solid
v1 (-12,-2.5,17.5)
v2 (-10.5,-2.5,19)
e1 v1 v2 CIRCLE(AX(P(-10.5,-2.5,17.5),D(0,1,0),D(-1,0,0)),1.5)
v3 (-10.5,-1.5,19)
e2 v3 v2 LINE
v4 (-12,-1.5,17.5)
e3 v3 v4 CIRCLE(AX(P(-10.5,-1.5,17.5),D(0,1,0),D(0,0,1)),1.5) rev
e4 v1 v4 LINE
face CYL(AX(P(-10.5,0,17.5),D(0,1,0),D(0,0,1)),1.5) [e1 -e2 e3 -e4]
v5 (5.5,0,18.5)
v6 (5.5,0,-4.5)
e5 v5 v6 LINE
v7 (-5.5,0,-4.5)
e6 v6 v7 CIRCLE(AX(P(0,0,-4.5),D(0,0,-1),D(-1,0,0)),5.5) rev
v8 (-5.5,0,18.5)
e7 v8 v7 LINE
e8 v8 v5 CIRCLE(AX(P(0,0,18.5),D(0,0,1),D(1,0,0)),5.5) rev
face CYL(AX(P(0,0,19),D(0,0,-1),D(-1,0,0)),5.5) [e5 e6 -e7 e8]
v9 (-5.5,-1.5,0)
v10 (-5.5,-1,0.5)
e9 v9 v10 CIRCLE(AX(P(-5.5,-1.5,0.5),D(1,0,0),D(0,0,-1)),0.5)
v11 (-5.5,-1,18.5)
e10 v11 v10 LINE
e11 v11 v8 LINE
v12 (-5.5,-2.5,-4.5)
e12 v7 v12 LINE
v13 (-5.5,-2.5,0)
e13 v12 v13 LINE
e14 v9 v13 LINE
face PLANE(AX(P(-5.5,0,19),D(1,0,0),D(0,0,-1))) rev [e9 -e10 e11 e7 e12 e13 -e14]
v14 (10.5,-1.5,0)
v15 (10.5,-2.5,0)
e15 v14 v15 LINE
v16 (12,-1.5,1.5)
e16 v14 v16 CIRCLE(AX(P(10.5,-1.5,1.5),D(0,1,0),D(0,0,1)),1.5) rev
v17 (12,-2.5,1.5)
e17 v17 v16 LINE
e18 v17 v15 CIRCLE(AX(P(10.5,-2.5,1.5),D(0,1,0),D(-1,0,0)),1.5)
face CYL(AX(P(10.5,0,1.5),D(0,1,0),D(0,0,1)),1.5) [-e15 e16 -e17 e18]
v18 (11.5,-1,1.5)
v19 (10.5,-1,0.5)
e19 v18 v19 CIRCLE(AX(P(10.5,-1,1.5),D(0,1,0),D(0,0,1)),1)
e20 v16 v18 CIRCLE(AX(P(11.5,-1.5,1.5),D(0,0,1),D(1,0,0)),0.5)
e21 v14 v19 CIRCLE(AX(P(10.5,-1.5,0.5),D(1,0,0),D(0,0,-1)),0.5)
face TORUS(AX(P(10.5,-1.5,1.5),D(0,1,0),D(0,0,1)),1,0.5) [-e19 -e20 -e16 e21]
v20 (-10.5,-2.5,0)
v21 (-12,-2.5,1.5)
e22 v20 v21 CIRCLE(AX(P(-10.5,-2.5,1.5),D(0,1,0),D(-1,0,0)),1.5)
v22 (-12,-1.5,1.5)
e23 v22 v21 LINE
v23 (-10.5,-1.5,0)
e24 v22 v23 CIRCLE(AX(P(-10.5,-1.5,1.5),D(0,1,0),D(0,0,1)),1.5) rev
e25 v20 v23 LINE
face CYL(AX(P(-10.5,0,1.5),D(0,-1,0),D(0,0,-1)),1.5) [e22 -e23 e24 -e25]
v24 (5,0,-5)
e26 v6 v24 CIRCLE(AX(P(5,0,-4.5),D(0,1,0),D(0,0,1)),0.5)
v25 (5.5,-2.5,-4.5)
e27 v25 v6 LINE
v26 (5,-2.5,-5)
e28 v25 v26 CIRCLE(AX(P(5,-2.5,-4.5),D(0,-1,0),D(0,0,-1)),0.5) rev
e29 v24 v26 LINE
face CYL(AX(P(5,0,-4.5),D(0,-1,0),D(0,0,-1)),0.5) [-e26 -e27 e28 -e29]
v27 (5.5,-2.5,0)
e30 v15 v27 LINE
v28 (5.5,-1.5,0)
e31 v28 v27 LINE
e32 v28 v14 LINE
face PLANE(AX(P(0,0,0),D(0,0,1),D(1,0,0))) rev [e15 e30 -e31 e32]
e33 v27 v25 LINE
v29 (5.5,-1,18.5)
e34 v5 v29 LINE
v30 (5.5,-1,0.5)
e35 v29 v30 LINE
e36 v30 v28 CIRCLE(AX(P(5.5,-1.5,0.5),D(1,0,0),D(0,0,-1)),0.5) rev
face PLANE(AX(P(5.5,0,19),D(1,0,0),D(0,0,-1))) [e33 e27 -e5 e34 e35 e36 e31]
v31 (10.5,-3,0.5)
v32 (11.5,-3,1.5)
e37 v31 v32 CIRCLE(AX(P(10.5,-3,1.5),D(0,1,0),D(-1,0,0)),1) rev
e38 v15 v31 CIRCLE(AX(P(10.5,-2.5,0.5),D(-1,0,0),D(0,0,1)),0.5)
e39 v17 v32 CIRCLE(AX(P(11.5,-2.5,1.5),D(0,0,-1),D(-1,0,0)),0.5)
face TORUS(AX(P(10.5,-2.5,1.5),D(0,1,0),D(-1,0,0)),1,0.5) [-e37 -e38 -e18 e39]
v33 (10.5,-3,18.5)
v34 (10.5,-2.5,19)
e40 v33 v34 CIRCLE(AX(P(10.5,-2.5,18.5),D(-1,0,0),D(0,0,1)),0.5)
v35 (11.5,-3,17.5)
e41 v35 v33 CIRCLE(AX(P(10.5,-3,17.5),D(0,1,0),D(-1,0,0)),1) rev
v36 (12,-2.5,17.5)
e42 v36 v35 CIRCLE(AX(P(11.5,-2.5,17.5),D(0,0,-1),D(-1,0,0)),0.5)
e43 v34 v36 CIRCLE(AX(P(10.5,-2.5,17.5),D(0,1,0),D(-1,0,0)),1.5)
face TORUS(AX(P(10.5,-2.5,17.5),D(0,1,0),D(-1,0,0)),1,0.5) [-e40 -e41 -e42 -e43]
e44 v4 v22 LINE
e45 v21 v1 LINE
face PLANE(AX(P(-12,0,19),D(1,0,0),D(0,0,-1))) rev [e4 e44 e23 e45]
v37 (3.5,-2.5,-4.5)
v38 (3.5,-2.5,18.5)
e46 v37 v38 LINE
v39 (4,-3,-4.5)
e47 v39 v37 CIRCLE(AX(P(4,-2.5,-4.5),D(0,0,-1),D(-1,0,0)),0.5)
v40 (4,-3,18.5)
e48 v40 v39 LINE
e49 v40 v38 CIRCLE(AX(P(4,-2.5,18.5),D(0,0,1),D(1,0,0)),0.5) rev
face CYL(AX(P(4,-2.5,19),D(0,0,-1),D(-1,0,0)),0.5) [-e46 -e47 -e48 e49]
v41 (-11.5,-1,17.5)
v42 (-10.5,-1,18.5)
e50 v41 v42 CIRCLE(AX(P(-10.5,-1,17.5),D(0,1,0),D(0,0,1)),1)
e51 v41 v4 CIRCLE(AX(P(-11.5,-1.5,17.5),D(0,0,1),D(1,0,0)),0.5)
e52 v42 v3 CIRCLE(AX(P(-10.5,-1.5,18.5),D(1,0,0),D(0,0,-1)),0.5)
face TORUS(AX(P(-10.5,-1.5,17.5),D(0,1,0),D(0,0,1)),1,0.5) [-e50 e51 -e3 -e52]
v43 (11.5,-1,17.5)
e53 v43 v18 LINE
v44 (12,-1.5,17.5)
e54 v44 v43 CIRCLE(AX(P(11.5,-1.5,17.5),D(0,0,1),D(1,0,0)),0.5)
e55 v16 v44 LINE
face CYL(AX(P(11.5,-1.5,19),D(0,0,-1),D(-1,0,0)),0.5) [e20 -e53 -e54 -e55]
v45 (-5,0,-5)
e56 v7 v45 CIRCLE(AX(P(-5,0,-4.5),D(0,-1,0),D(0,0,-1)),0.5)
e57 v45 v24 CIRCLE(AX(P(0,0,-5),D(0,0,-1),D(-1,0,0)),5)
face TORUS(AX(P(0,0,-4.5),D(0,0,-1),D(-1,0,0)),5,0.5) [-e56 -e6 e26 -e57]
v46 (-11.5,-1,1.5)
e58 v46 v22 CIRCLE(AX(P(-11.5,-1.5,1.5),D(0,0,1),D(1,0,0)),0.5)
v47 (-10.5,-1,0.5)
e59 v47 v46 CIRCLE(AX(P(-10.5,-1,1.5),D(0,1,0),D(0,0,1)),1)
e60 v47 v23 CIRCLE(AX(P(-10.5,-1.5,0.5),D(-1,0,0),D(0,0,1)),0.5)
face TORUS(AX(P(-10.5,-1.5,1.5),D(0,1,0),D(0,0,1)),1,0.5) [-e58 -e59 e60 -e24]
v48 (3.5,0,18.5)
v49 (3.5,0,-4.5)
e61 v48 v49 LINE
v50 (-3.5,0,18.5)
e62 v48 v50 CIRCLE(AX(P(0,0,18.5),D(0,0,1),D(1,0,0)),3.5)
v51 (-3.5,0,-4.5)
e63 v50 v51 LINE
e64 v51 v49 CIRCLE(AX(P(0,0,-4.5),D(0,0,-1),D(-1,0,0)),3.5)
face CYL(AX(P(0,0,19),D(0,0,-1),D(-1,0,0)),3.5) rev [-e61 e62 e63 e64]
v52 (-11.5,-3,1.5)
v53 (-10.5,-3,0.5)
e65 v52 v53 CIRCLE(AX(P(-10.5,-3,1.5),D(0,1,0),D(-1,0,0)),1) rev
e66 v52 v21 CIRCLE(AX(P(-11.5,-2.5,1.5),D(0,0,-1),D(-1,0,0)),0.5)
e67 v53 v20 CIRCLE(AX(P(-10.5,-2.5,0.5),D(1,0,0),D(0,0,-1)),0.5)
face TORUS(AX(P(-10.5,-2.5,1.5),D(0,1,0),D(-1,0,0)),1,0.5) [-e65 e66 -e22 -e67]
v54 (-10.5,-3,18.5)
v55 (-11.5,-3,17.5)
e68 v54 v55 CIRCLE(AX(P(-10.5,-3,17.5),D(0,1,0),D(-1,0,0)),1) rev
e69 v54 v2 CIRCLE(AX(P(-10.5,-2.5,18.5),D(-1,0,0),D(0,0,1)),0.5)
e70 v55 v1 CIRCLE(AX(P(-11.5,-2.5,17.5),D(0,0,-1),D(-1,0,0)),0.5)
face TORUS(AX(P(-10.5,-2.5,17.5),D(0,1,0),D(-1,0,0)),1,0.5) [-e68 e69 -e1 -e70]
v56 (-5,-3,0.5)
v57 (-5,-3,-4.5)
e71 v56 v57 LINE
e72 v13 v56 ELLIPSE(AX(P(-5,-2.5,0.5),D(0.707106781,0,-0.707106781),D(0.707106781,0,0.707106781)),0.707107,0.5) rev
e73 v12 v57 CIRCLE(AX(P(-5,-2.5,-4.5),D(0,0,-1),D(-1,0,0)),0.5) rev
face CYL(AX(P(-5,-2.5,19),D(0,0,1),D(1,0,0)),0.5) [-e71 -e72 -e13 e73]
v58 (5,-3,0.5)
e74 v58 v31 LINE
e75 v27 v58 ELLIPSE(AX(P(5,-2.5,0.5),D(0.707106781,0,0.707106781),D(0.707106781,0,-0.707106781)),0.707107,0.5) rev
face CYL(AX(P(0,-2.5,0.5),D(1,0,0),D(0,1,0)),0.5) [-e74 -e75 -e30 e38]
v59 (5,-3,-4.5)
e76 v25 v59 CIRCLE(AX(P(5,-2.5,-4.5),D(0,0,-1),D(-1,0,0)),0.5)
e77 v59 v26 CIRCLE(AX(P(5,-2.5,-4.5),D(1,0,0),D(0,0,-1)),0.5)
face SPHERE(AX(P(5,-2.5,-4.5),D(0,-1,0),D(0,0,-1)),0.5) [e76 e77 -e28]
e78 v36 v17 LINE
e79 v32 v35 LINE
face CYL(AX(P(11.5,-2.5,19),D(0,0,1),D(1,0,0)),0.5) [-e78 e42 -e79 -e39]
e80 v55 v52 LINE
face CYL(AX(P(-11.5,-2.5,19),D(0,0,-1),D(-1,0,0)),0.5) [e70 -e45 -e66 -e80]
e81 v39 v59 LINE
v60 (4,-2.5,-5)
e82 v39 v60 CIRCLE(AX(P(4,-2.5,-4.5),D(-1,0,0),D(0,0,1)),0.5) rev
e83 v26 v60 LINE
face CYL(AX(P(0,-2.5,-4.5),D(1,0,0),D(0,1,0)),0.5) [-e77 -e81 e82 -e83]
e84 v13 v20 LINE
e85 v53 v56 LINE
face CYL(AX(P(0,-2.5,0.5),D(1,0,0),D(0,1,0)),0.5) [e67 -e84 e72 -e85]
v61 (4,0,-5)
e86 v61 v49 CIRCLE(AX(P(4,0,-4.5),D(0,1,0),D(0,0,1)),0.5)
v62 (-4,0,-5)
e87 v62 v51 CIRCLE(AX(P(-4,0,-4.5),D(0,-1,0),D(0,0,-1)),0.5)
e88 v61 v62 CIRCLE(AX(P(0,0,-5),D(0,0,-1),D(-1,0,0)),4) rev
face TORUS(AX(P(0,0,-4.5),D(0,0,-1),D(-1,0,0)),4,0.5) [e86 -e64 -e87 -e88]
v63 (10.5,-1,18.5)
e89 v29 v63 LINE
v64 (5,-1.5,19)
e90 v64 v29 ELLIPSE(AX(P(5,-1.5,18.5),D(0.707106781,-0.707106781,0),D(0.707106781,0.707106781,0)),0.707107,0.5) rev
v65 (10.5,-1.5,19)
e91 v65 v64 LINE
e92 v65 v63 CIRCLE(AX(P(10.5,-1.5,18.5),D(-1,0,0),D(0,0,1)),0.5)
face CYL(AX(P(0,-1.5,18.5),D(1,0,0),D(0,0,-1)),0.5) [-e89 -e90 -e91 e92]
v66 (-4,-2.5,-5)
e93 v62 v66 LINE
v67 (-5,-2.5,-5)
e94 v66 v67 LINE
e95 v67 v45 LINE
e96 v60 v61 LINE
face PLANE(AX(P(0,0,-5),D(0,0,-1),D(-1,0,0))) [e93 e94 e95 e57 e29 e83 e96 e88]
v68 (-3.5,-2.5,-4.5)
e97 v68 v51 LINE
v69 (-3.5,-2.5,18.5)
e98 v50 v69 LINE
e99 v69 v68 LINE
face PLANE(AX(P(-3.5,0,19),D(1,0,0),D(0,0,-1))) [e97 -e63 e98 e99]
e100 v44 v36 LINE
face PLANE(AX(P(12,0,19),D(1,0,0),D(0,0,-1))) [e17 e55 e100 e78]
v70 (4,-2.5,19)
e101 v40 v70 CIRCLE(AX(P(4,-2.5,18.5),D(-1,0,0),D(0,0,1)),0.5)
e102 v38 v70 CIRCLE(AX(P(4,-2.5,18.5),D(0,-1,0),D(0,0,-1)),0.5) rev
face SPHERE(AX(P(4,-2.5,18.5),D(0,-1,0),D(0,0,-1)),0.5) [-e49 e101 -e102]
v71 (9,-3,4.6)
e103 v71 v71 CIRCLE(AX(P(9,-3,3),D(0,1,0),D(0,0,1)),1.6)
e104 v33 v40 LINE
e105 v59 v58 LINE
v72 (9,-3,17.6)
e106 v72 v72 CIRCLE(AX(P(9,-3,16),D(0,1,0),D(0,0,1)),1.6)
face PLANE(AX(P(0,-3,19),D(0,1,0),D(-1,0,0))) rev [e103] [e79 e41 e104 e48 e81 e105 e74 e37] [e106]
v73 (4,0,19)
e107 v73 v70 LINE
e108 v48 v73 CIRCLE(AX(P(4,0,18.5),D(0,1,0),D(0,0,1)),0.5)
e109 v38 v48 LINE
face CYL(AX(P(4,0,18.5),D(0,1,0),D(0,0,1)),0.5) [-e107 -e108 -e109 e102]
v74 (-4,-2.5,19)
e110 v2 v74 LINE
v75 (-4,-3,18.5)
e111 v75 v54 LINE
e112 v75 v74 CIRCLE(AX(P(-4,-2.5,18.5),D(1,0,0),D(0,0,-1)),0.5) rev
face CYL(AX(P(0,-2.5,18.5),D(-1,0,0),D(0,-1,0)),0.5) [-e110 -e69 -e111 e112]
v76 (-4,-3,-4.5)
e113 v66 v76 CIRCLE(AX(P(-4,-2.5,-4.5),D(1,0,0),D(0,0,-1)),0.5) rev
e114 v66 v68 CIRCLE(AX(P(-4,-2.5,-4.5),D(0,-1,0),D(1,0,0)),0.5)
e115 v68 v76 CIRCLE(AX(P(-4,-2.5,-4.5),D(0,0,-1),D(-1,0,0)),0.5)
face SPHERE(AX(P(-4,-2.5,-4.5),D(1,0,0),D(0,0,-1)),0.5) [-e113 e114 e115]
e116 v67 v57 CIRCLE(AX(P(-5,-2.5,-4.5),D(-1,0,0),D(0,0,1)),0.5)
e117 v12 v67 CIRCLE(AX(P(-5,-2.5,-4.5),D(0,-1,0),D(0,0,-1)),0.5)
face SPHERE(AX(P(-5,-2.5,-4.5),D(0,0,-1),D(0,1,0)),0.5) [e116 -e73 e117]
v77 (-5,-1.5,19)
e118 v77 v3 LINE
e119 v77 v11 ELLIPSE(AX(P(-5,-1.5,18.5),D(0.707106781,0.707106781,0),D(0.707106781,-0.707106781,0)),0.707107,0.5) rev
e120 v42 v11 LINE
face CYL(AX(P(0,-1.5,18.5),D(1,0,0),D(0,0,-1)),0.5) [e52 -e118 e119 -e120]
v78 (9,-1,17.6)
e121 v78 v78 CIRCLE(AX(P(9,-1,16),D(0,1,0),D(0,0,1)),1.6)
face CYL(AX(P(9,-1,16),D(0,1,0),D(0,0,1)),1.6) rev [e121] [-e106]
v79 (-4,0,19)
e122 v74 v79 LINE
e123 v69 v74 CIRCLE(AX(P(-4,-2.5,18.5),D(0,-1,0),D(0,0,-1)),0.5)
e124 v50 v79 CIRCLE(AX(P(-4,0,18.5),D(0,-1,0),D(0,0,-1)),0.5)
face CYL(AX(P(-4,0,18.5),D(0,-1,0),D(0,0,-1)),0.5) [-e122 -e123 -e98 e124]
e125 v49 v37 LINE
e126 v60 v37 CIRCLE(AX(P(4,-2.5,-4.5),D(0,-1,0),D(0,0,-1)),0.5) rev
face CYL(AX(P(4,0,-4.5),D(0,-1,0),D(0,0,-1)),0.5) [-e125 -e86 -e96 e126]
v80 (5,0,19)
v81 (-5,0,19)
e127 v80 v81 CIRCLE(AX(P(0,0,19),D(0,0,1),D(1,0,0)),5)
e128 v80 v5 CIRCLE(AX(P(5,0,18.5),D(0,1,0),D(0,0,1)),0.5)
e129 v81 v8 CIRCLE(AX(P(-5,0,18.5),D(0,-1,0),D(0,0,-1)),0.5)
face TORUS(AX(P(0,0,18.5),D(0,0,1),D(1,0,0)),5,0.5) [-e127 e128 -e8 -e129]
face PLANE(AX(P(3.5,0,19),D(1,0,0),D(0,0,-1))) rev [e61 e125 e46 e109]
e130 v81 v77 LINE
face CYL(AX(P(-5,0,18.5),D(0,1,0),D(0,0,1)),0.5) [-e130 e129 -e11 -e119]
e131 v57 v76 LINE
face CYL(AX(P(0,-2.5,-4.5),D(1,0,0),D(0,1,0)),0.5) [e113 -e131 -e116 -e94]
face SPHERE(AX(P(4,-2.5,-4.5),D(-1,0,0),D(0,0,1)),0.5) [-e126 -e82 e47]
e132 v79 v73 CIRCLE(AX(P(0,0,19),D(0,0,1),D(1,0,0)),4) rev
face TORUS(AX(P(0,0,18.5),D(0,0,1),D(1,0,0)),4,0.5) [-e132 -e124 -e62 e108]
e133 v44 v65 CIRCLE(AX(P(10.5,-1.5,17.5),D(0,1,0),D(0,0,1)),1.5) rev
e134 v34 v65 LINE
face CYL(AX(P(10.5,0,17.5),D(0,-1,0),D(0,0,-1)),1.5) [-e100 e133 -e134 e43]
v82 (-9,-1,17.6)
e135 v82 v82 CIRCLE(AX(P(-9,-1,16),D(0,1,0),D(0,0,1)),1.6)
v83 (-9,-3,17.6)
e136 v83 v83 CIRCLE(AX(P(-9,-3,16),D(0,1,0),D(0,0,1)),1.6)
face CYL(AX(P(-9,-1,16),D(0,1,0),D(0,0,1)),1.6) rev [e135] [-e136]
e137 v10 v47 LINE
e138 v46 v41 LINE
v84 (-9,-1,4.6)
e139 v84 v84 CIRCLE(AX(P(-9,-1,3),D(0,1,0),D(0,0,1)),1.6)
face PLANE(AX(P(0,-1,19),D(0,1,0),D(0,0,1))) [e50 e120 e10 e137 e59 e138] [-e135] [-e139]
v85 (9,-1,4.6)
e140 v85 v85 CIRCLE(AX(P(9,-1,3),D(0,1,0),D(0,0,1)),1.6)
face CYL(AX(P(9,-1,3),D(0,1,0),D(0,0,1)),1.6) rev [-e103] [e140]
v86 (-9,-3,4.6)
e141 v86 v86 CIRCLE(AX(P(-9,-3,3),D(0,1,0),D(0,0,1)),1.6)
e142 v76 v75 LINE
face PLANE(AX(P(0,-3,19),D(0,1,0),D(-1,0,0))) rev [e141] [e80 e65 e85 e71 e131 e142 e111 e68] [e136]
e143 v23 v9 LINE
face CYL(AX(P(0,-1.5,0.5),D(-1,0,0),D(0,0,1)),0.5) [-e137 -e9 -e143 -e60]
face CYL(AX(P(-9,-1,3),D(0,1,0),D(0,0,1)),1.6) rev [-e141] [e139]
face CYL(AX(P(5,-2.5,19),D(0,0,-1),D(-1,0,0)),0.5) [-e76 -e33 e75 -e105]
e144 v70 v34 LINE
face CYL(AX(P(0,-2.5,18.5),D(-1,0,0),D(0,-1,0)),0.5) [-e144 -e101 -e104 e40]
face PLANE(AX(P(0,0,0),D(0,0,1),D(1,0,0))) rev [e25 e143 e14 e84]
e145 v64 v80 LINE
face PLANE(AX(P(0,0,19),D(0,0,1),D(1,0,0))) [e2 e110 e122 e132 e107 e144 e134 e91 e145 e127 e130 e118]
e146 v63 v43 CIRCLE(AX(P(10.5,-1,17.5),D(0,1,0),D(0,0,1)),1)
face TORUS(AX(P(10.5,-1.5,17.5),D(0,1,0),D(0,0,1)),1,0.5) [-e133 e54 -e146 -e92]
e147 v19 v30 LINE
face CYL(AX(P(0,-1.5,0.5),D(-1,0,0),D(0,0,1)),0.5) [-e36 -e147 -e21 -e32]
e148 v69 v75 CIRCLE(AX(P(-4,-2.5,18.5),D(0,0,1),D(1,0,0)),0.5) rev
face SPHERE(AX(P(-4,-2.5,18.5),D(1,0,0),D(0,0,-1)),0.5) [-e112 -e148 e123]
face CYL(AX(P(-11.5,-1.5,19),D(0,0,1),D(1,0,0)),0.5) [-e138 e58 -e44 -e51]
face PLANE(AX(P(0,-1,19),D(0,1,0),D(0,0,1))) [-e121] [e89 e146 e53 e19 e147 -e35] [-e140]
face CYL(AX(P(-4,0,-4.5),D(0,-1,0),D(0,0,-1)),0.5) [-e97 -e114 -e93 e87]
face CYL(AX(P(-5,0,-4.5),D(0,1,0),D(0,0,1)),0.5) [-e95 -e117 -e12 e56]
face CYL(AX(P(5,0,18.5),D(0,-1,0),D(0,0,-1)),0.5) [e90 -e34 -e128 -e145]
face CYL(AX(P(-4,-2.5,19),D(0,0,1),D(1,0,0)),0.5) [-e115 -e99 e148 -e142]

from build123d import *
from build123d.topology import SkipClean

# Parameters (mm, degrees)
BOSS_EXTRUDE1_DEPTH  = 19
M3_CLEARANCE_HOLE1_D = 3.2
BOSS_EXTRUDE2_START  = 5
BOSS_EXTRUDE2_DEPTH  = 5
M3_CLEARANCE_HOLE2_D = 3.2
FILLET1_R            = 1.5
FILLET2_R            = 0.5


with BuildPart() as part:
    # Sketch1 → Boss-Extrude1 (new body)
    with BuildSketch(Plane.XY):
        with BuildLine():
            ThreePointArc((-5.5, 0), (-5.477033779, -0.502096593), (-5.408326913, -1))
            Line((-5.408326913, -1), (-3.5, -1))
            Line((-3.5, -1), (-3.5, 0))
            ThreePointArc((-3.5, 0), (0, 3.5), (3.5, 0))
            Line((3.5, 0), (3.5, -1))
            Line((3.5, -1), (5.408326913, -1))
            ThreePointArc((5.408326913, -1), (5.477033779, -0.502096593), (5.5, 0))
            ThreePointArc((5.5, 0), (0, 5.5), (-5.5, 0))
        make_face()
        with BuildLine():
            Line((5.5, -1), (5.5, 0))
            ThreePointArc((5.5, 0), (5.477033779, -0.502096593), (5.408326913, -1))
            Line((5.408326913, -1), (5.5, -1))
        make_face()
        with BuildLine():
            Line((-5.5, 0), (-5.5, -1))
            Line((-5.5, -1), (-5.408326913, -1))
            ThreePointArc((-5.408326913, -1), (-5.477033779, -0.502096593), (-5.5, 0))
        make_face()
        with BuildLine():
            Line((-5.5, -1), (-12, -1))
            Line((-12, -1), (-12, -3))
            Line((-12, -3), (-4.609772229, -3))
            ThreePointArc((-4.609772229, -3), (-5.107893656, -2.039466204), (-5.408326913, -1))
            Line((-5.408326913, -1), (-5.5, -1))
        make_face()
        with BuildLine():
            Line((-3.5, -1), (-5.408326913, -1))
            ThreePointArc((-5.408326913, -1), (-5.107893656, -2.039466204), (-4.609772229, -3))
            Line((-4.609772229, -3), (-3.5, -3))
            Line((-3.5, -3), (-3.5, -1))
        make_face()
        with BuildLine():
            Line((3.5, -3), (4.609772229, -3))
            ThreePointArc((4.609772229, -3), (5.107893656, -2.039466204), (5.408326913, -1))
            Line((5.408326913, -1), (3.5, -1))
            Line((3.5, -1), (3.5, -3))
        make_face()
        with BuildLine():
            ThreePointArc((5.408326913, -1), (5.107893656, -2.039466204), (4.609772229, -3))
            Line((4.609772229, -3), (12, -3))
            Line((12, -3), (12, -1))
            Line((12, -1), (5.5, -1))
            Line((5.5, -1), (5.408326913, -1))
        make_face()
    extrude(amount=BOSS_EXTRUDE1_DEPTH)

    # M3 Clearance Hole1 (through all)
    with Locations(Plane(origin=(0, -1, 0), x_dir=(1, 0, 0), z_dir=(0, 1, 0))):
        with Locations((9, -3), (-9, -3)):
            Hole(M3_CLEARANCE_HOLE1_D / 2)

    # Sketch5 → Boss-Extrude2 (add)
    with SkipClean():  # the faces are left unmerged after this step: merging them gives an invalid solid
        with BuildSketch(Plane(origin=(0, 0, 0), x_dir=(-1, 0, 0), z_dir=(0, 0, -1)).offset(BOSS_EXTRUDE2_START)):
            with BuildLine():
                Line((-5.5, 0), (-5.5, -1))
                Line((-5.5, -1), (-5.5, -3))
                Line((-5.5, -3), (-3.5, -3))
                Line((-3.5, -3), (-3.5, 0))
                ThreePointArc((-3.5, 0), (0, 3.5), (3.5, 0))
                Line((3.5, 0), (3.5, -3))
                Line((3.5, -3), (5.5, -3))
                Line((5.5, -3), (5.5, -1))
                Line((5.5, -1), (5.5, 0))
                ThreePointArc((5.5, 0), (0, 5.5), (-5.5, 0))
            make_face()
        extrude(amount=-BOSS_EXTRUDE2_DEPTH)

    # M3 Clearance Hole2 (through all)
    with Locations(Plane(origin=(0, -1, 0), x_dir=(1, 0, 0), z_dir=(0, 1, 0))):
        with Locations((-9, -16), (9, -16)):
            Hole(M3_CLEARANCE_HOLE2_D / 2)

    # Fillet1
    fillet1_edges = [part.edges().sort_by_distance(p)[0] for p in [
        (12, -2, 0),
        (-12, -2, 0),
        (-12, -2, 19),
        (12, -2, 19),
    ]]
    fillet(fillet1_edges, radius=FILLET1_R)

    # Fillet2
    # the kernel refuses this fillet: 0.5 mm, written as the material it takes off along each edge
    with BuildSketch(Plane(origin=(-4, -2.5, 18.5), x_dir=(0, -1, 0), z_dir=(0, 0, 1))) as fillet2_piece_1_section:
        Polygon((0, 0), (FILLET2_R, 0), (FILLET2_R, FILLET2_R), (0, FILLET2_R), align=None)
    fillet2_piece_1 = extrude(amount=FILLET2_R, mode=Mode.PRIVATE)
    fillet2_piece_1 = fillet2_piece_1 - Plane(origin=(-4, -2.5, 18.5), x_dir=(-0.7071067811865477, 0.7071067811865475, 0), z_dir=(0, 0, 1)) * Sphere(FILLET2_R, mode=Mode.PRIVATE)
    add(fillet2_piece_1, mode=Mode.SUBTRACT)
    with BuildSketch(Plane(origin=(4, -2.5, 18.5), x_dir=(-1, 0, 0), z_dir=(0, 0, 1))) as fillet2_piece_2_section:
        Polygon((0, 0), (FILLET2_R, 0), (FILLET2_R, FILLET2_R), (0, FILLET2_R), align=None)
    fillet2_piece_2 = extrude(amount=FILLET2_R, mode=Mode.PRIVATE)
    fillet2_piece_2 = fillet2_piece_2 - Plane(origin=(4, -2.5, 18.5), x_dir=(0.7071067811865475, 0.7071067811865475, 0), z_dir=(0, 0, 1)) * Sphere(FILLET2_R, mode=Mode.PRIVATE)
    add(fillet2_piece_2, mode=Mode.SUBTRACT)
    with BuildSketch(Plane(origin=(-5, -2.5, -4.5), x_dir=(0, -1, 0), z_dir=(-1, 0, 0))) as fillet2_piece_3_section:
        Polygon((0, 0), (FILLET2_R, 0), (FILLET2_R, -FILLET2_R), (0, -FILLET2_R), align=None)
    fillet2_piece_3 = extrude(amount=FILLET2_R, mode=Mode.PRIVATE)
    fillet2_piece_3 = fillet2_piece_3 - Plane(origin=(-5, -2.5, -4.5), x_dir=(0, 0.7071067811865475, 0.7071067811865475), z_dir=(-1, 0, 0)) * Sphere(FILLET2_R, mode=Mode.PRIVATE)
    add(fillet2_piece_3, mode=Mode.SUBTRACT)
    with BuildSketch(Plane(origin=(5, -2.5, -4.5), x_dir=(1, 0, 0), z_dir=(0, 0, -1))) as fillet2_piece_4_section:
        Polygon((0, 0), (FILLET2_R, 0), (FILLET2_R, FILLET2_R), (0, FILLET2_R), align=None)
    fillet2_piece_4 = extrude(amount=FILLET2_R, mode=Mode.PRIVATE)
    fillet2_piece_4 = fillet2_piece_4 - Plane(origin=(5, -2.5, -4.5), x_dir=(-0.7071067811865475, 0.7071067811865475, 0), z_dir=(0, 0, -1)) * Sphere(FILLET2_R, mode=Mode.PRIVATE)
    add(fillet2_piece_4, mode=Mode.SUBTRACT)
    with BuildSketch(Plane(origin=(4, -2.5, -4.5), x_dir=(0, -1, 0), z_dir=(-1, 0, 0))) as fillet2_piece_5_section:
        Polygon((0, 0), (FILLET2_R, 0), (FILLET2_R, -FILLET2_R), (0, -FILLET2_R), align=None)
    fillet2_piece_5 = extrude(amount=FILLET2_R, mode=Mode.PRIVATE)
    fillet2_piece_5 = fillet2_piece_5 - Plane(origin=(4, -2.5, -4.5), x_dir=(0, 0.7071067811865475, 0.7071067811865475), z_dir=(-1, 0, 0)) * Sphere(FILLET2_R, mode=Mode.PRIVATE)
    add(fillet2_piece_5, mode=Mode.SUBTRACT)
    with BuildSketch(Plane(origin=(-4, -2.5, -4.5), x_dir=(1, 0, 0), z_dir=(0, -1, 0))) as fillet2_piece_6_section:
        Polygon((0, 0), (FILLET2_R, 0), (FILLET2_R, -FILLET2_R), (0, -FILLET2_R), align=None)
    fillet2_piece_6 = extrude(amount=FILLET2_R, mode=Mode.PRIVATE)
    fillet2_piece_6 = fillet2_piece_6 - Plane(origin=(-4, -2.5, -4.5), x_dir=(-0.7071067811865475, 0, 0.7071067811865475), z_dir=(0, -1, 0)) * Sphere(FILLET2_R, mode=Mode.PRIVATE)
    add(fillet2_piece_6, mode=Mode.SUBTRACT)
    with BuildSketch(Plane(origin=(12, -1, 1.5), x_dir=(-1, 0, 0), z_dir=(0, 0, 1)), Plane(origin=(-12, -3, 1.5), x_dir=(1, 0, 0), z_dir=(0, 0, 1))) as fillet2_piece_7:
        with BuildLine():
            CenterArc((FILLET2_R, FILLET2_R), FILLET2_R, 180, 90)
            Line((0, FILLET2_R), (0, 0))
            Line((0, 0), (FILLET2_R, 0))
        make_face()
    extrude(amount=16, mode=Mode.SUBTRACT)
    with BuildSketch(Plane(origin=(12, -3, 1.5), x_dir=(-1, 0, 0), z_dir=(0, 0, 1)), Plane(origin=(-12, -1, 1.5), x_dir=(1, 0, 0), z_dir=(0, 0, 1))) as fillet2_piece_8:
        with BuildLine():
            CenterArc((FILLET2_R, -FILLET2_R), FILLET2_R, 90, 90)
            Line((0, -FILLET2_R), (0, 0))
            Line((0, 0), (FILLET2_R, 0))
        make_face()
    extrude(amount=16, mode=Mode.SUBTRACT)
    with BuildSketch(Plane(origin=(10.5, -3, 1.5), x_dir=(1, 0, 0), z_dir=(0, 0, 1))) as fillet2_piece_9:
        with BuildLine():
            CenterArc((1.5 - FILLET2_R, FILLET2_R), FILLET2_R, 270, 90)
            Line((1.5, FILLET2_R), (1.5, 0))
            Line((1.5, 0), (1.5 - FILLET2_R, 0))
        make_face()
    revolve(axis=Axis((10.5, -3, 1.5), (0, 1, 0)), revolution_arc=90, mode=Mode.SUBTRACT)
    with BuildSketch(Plane(origin=(10.5, -3, 17.5), x_dir=(0, 0, 1), z_dir=(-1, 0, 0))) as fillet2_piece_10:
        with BuildLine():
            CenterArc((1.5 - FILLET2_R, FILLET2_R), FILLET2_R, 270, 90)
            Line((1.5 - FILLET2_R, 0), (1.5, 0))
            Line((1.5, 0), (1.5, FILLET2_R))
        make_face()
    revolve(axis=Axis((10.5, -3, 17.5), (0, 1, 0)), revolution_arc=90, mode=Mode.SUBTRACT)
    with BuildSketch(Plane(origin=(-10.5, -1, 19), x_dir=(0, -1, 0), z_dir=(1, 0, 0)), Plane(origin=(-5.5, -3, 0), x_dir=(0, 0, 1), z_dir=(-1, 0, 0)), Plane(origin=(5.5, -1, 19), x_dir=(0, -1, 0), z_dir=(1, 0, 0)), Plane(origin=(10.5, -3, 0), x_dir=(0, 0, 1), z_dir=(-1, 0, 0))) as fillet2_piece_11:
        with BuildLine():
            CenterArc((FILLET2_R, FILLET2_R), FILLET2_R, 180, 90)
            Line((0, FILLET2_R), (0, 0))
            Line((0, 0), (FILLET2_R, 0))
        make_face()
    extrude(amount=5, mode=Mode.SUBTRACT)
    with BuildSketch(Plane(origin=(-10.5, -3, 19), x_dir=(0, 1, 0), z_dir=(1, 0, 0)), Plane(origin=(4, -3, 19), x_dir=(0, 1, 0), z_dir=(1, 0, 0))) as fillet2_piece_12:
        with BuildLine():
            CenterArc((FILLET2_R, -FILLET2_R), FILLET2_R, 90, 90)
            Line((0, -FILLET2_R), (0, 0))
            Line((0, 0), (FILLET2_R, 0))
        make_face()
    extrude(amount=6.5, mode=Mode.SUBTRACT)
    with BuildSketch(Plane(origin=(5.5, -1, 19), x_dir=(-1, 0, 0), z_dir=(0, 1, 0)), Plane(origin=(-5.5, 0, 19), x_dir=(1, 0, 0), z_dir=(0, -1, 0))) as fillet2_piece_13:
        with BuildLine():
            CenterArc((FILLET2_R, -FILLET2_R), FILLET2_R, 90, 90)
            Line((0, -FILLET2_R), (0, 0))
            Line((0, 0), (FILLET2_R, 0))
        make_face()
    extrude(amount=1, mode=Mode.SUBTRACT)
    with BuildSketch(Plane(origin=(10.5, -1, 1.5), x_dir=(1, 0, 0), z_dir=(0, 0, 1))) as fillet2_piece_14:
        with BuildLine():
            CenterArc((1.5 - FILLET2_R, -FILLET2_R), FILLET2_R, 0, 90)
            Line((1.5, -FILLET2_R), (1.5, 0))
            Line((1.5, 0), (1.5 - FILLET2_R, 0))
        make_face()
    revolve(axis=Axis((10.5, -1, 1.5), (0, 1, 0)), revolution_arc=90, mode=Mode.SUBTRACT)
    with BuildSketch(Plane(origin=(10.5, -1, 17.5), x_dir=(0, 0, 1), z_dir=(-1, 0, 0))) as fillet2_piece_15:
        with BuildLine():
            CenterArc((1.5 - FILLET2_R, -FILLET2_R), FILLET2_R, 0, 90)
            Line((1.5, -FILLET2_R), (1.5, 0))
            Line((1.5, 0), (1.5 - FILLET2_R, 0))
        make_face()
    revolve(axis=Axis((10.5, -1, 17.5), (0, 1, 0)), revolution_arc=90, mode=Mode.SUBTRACT)
    with BuildSketch(Plane(origin=(-10.5, -3, 17.5), x_dir=(0, 0, 1), z_dir=(1, 0, 0))) as fillet2_piece_16:
        with BuildLine():
            CenterArc((1.5 - FILLET2_R, -FILLET2_R), FILLET2_R, 0, 90)
            Line((1.5 - FILLET2_R, 0), (1.5, 0))
            Line((1.5, 0), (1.5, -FILLET2_R))
        make_face()
    revolve(axis=Axis((-10.5, -3, 17.5), (0, -1, 0)), revolution_arc=90, mode=Mode.SUBTRACT)
    with BuildSketch(Plane(origin=(-10.5, -3, 1.5), x_dir=(-1, 0, 0), z_dir=(0, 0, 1))) as fillet2_piece_17:
        with BuildLine():
            CenterArc((1.5 - FILLET2_R, -FILLET2_R), FILLET2_R, 0, 90)
            Line((1.5, -FILLET2_R), (1.5, 0))
            Line((1.5, 0), (1.5 - FILLET2_R, 0))
        make_face()
    revolve(axis=Axis((-10.5, -3, 1.5), (0, -1, 0)), revolution_arc=90, mode=Mode.SUBTRACT)
    with BuildSketch(Plane(origin=(-5.5, -1, 0), x_dir=(0, 0, 1), z_dir=(-1, 0, 0)), Plane(origin=(10.5, -1, 0), x_dir=(0, 0, 1), z_dir=(-1, 0, 0))) as fillet2_piece_18:
        with BuildLine():
            CenterArc((FILLET2_R, -FILLET2_R), FILLET2_R, 90, 90)
            Line((0, -FILLET2_R), (0, 0))
            Line((0, 0), (FILLET2_R, 0))
        make_face()
    extrude(amount=5, mode=Mode.SUBTRACT)
    with BuildSketch(Plane(origin=(-10.5, -1, 17.5), x_dir=(0, 0, 1), z_dir=(1, 0, 0))) as fillet2_piece_19:
        with BuildLine():
            CenterArc((1.5 - FILLET2_R, FILLET2_R), FILLET2_R, 270, 90)
            Line((1.5, FILLET2_R), (1.5, 0))
            Line((1.5, 0), (1.5 - FILLET2_R, 0))
        make_face()
    revolve(axis=Axis((-10.5, -1, 17.5), (0, -1, 0)), revolution_arc=90, mode=Mode.SUBTRACT)
    with BuildSketch(Plane(origin=(-10.5, -1, 1.5), x_dir=(-1, 0, 0), z_dir=(0, 0, 1))) as fillet2_piece_20:
        with BuildLine():
            CenterArc((1.5 - FILLET2_R, FILLET2_R), FILLET2_R, 270, 90)
            Line((1.5, FILLET2_R), (1.5, 0))
            Line((1.5, 0), (1.5 - FILLET2_R, 0))
        make_face()
    revolve(axis=Axis((-10.5, -1, 1.5), (0, -1, 0)), revolution_arc=90, mode=Mode.SUBTRACT)
    with BuildSketch(Plane(origin=(0, 0, 19), x_dir=(-1, 0, 0), z_dir=(0, -1, 0))) as fillet2_piece_21:
        with BuildLine():
            CenterArc((5.5 - FILLET2_R, FILLET2_R), FILLET2_R, 270, 90)
            Line((5.5, FILLET2_R), (5.5, 0))
            Line((5.5, 0), (5.5 - FILLET2_R, 0))
        make_face()
    revolve(axis=Axis((0, 0, 19), (0, 0, -1)), revolution_arc=180, mode=Mode.SUBTRACT)
    with BuildSketch(Plane(origin=(3.5, -3, 0), x_dir=(0, 1, 0), z_dir=(0, 0, 1)), Plane(origin=(-3.5, -3, 0), x_dir=(-1, 0, 0), z_dir=(0, 0, 1))) as fillet2_piece_22:
        with BuildLine():
            CenterArc((FILLET2_R, -FILLET2_R), FILLET2_R, 90, 90)
            Line((0, -FILLET2_R), (0, 0))
            Line((0, 0), (FILLET2_R, 0))
        make_face()
    extrude(amount=18.5, mode=Mode.SUBTRACT)
    with BuildSketch(Plane(origin=(-3.5, -2.5, 19), x_dir=(-1, 0, 0), z_dir=(0, 1, 0)), Plane(origin=(-5.5, 0, -5), x_dir=(0, 0, 1), z_dir=(0, -1, 0)), Plane(origin=(3.5, 0, 19), x_dir=(1, 0, 0), z_dir=(0, -1, 0)), Plane(origin=(5.5, -2.5, -5), x_dir=(0, 0, 1), z_dir=(0, 1, 0))) as fillet2_piece_23:
        with BuildLine():
            CenterArc((FILLET2_R, -FILLET2_R), FILLET2_R, 90, 90)
            Line((0, -FILLET2_R), (0, 0))
            Line((0, 0), (FILLET2_R, 0))
        make_face()
    extrude(amount=2.5, mode=Mode.SUBTRACT)
    with BuildSketch(Plane(origin=(0, 0, 19), x_dir=(-1, 0, 0), z_dir=(0, -1, 0))) as fillet2_piece_24:
        with BuildLine():
            CenterArc((3.5 + FILLET2_R, FILLET2_R), FILLET2_R, 180, 90)
            Line((3.5, FILLET2_R), (3.5, 0))
            Line((3.5, 0), (3.5 + FILLET2_R, 0))
        make_face()
    revolve(axis=Axis((0, 0, 19), (0, 0, -1)), revolution_arc=180, mode=Mode.SUBTRACT)
    with BuildSketch(Plane(origin=(-5.5, -3, -4.5), x_dir=(0, 1, 0), z_dir=(0, 0, 1)), Plane(origin=(-3.5, -3, -4.5), x_dir=(-1, 0, 0), z_dir=(0, 0, 1)), Plane(origin=(3.5, -3, -4.5), x_dir=(0, 1, 0), z_dir=(0, 0, 1))) as fillet2_piece_25:
        with BuildLine():
            CenterArc((FILLET2_R, -FILLET2_R), FILLET2_R, 90, 90)
            Line((0, -FILLET2_R), (0, 0))
            Line((0, 0), (FILLET2_R, 0))
        make_face()
    extrude(amount=4.5, mode=Mode.SUBTRACT)
    with BuildSketch(Plane(origin=(5.5, -3, -4.5), x_dir=(0, 1, 0), z_dir=(0, 0, 1))) as fillet2_piece_26:
        with BuildLine():
            CenterArc((FILLET2_R, FILLET2_R), FILLET2_R, 180, 90)
            Line((0, FILLET2_R), (0, 0))
            Line((0, 0), (FILLET2_R, 0))
        make_face()
    extrude(amount=4.5, mode=Mode.SUBTRACT)
    with BuildSketch(Plane(origin=(0, 0, -5), x_dir=(-1, 0, 0), z_dir=(0, -1, 0))) as fillet2_piece_27:
        with BuildLine():
            CenterArc((5.5 - FILLET2_R, -FILLET2_R), FILLET2_R, 0, 90)
            Line((5.5 - FILLET2_R, 0), (5.5, 0))
            Line((5.5, 0), (5.5, -FILLET2_R))
        make_face()
    revolve(axis=Axis((0, 0, -5), (0, 0, -1)), revolution_arc=180, mode=Mode.SUBTRACT)
    with BuildSketch(Plane(origin=(5, -3, -5), x_dir=(0, 0, 1), z_dir=(-1, 0, 0)), Plane(origin=(-4, -3, -5), x_dir=(0, 0, 1), z_dir=(-1, 0, 0))) as fillet2_piece_28:
        with BuildLine():
            CenterArc((FILLET2_R, FILLET2_R), FILLET2_R, 180, 90)
            Line((0, FILLET2_R), (0, 0))
            Line((0, 0), (FILLET2_R, 0))
        make_face()
    extrude(amount=1, mode=Mode.SUBTRACT)
    with BuildSketch(Plane(origin=(3.5, -2.5, -5), x_dir=(0, 0, 1), z_dir=(0, 1, 0)), Plane(origin=(-3.5, 0, -5), x_dir=(0, 0, 1), z_dir=(0, -1, 0))) as fillet2_piece_29:
        with BuildLine():
            CenterArc((FILLET2_R, FILLET2_R), FILLET2_R, 180, 90)
            Line((0, FILLET2_R), (0, 0))
            Line((0, 0), (FILLET2_R, 0))
        make_face()
    extrude(amount=2.5, mode=Mode.SUBTRACT)
    with BuildSketch(Plane(origin=(0, 0, -5), x_dir=(1, 0, 0), z_dir=(0, -1, 0))) as fillet2_piece_30:
        with BuildLine():
            CenterArc((3.5 + FILLET2_R, FILLET2_R), FILLET2_R, 180, 90)
            Line((3.5 + FILLET2_R, 0), (3.5, 0))
            Line((3.5, 0), (3.5, FILLET2_R))
        make_face()
    revolve(axis=Axis((0, 0, -5), (0, 0, 1)), revolution_arc=180, mode=Mode.SUBTRACT)
    with BuildSketch(Plane(origin=(-10.5, -1, 19), x_dir=(0, -1, 0), z_dir=(1, 0, 0))) as fillet2_piece_31a_section:
        with BuildLine():
            CenterArc((FILLET2_R, FILLET2_R), FILLET2_R, 180, 90)
            Line((0, FILLET2_R), (0, 0))
            Line((0, 0), (FILLET2_R, 0))
        make_face()
    fillet2_piece_31a = extrude(amount=6.25, mode=Mode.PRIVATE)
    fillet2_piece_31a = split(fillet2_piece_31a, bisect_by=Plane(origin=(-5.5, -1.113197557, 18.886802443), z_dir=(1, 0, 0)), keep=Keep.TOP, mode=Mode.PRIVATE)
    with BuildSketch(Plane(origin=(-5.5, 0, 19), x_dir=(1, 0, 0), z_dir=(0, -1, 0))) as fillet2_piece_31b_section:
        with BuildLine():
            CenterArc((FILLET2_R, -FILLET2_R), FILLET2_R, 90, 90)
            Line((0, -FILLET2_R), (0, 0))
            Line((0, 0), (FILLET2_R, 0))
        make_face()
    fillet2_piece_31b = extrude(amount=2.25, mode=Mode.PRIVATE)
    fillet2_piece_31b = split(fillet2_piece_31b, bisect_by=Plane(origin=(-5.386802443, -1, 18.886802443), z_dir=(0, -1, 0)), keep=Keep.TOP, mode=Mode.PRIVATE)
    fillet2_piece_31 = fillet2_piece_31a & fillet2_piece_31b
    add(fillet2_piece_31, mode=Mode.SUBTRACT)
    with BuildSketch(Plane(origin=(5.5, -2.25, 19), x_dir=(-1, 0, 0), z_dir=(0, 1, 0))) as fillet2_piece_32a_section:
        with BuildLine():
            CenterArc((FILLET2_R, -FILLET2_R), FILLET2_R, 90, 90)
            Line((0, -FILLET2_R), (0, 0))
            Line((0, 0), (FILLET2_R, 0))
        make_face()
    fillet2_piece_32a = extrude(amount=2.25, mode=Mode.PRIVATE)
    fillet2_piece_32a = split(fillet2_piece_32a, bisect_by=Plane(origin=(5.386802443, -1, 18.886802443), z_dir=(0, -1, 0)), keep=Keep.TOP, mode=Mode.PRIVATE)
    with BuildSketch(Plane(origin=(4.25, -1, 19), x_dir=(0, -1, 0), z_dir=(1, 0, 0))) as fillet2_piece_32b_section:
        with BuildLine():
            CenterArc((FILLET2_R, FILLET2_R), FILLET2_R, 180, 90)
            Line((0, FILLET2_R), (0, 0))
            Line((0, 0), (FILLET2_R, 0))
        make_face()
    fillet2_piece_32b = extrude(amount=6.25, mode=Mode.PRIVATE)
    fillet2_piece_32b = split(fillet2_piece_32b, bisect_by=Plane(origin=(5.5, -1.113197557, 18.886802443), z_dir=(-1, 0, 0)), keep=Keep.TOP, mode=Mode.PRIVATE)
    fillet2_piece_32 = fillet2_piece_32a & fillet2_piece_32b
    add(fillet2_piece_32, mode=Mode.SUBTRACT)
    with BuildSketch(Plane(origin=(-4.25, -3, 0), x_dir=(0, 0, 1), z_dir=(-1, 0, 0))) as fillet2_piece_33a_section:
        with BuildLine():
            CenterArc((FILLET2_R, FILLET2_R), FILLET2_R, 180, 90)
            Line((0, FILLET2_R), (0, 0))
            Line((0, 0), (FILLET2_R, 0))
        make_face()
    fillet2_piece_33a = extrude(amount=6.25, mode=Mode.PRIVATE)
    fillet2_piece_33a = split(fillet2_piece_33a, bisect_by=Plane(origin=(-5.5, -2.886802443, 0.113197557), z_dir=(1, 0, 0)), keep=Keep.TOP, mode=Mode.PRIVATE)
    with BuildSketch(Plane(origin=(-5.5, -3, -4.5), x_dir=(0, 1, 0), z_dir=(0, 0, 1))) as fillet2_piece_33b_section:
        with BuildLine():
            CenterArc((FILLET2_R, -FILLET2_R), FILLET2_R, 90, 90)
            Line((0, -FILLET2_R), (0, 0))
            Line((0, 0), (FILLET2_R, 0))
        make_face()
    fillet2_piece_33b = extrude(amount=5.75, mode=Mode.PRIVATE)
    fillet2_piece_33b = split(fillet2_piece_33b, bisect_by=Plane(origin=(-5.386802443, -2.886802443, 0), z_dir=(0, 0, 1)), keep=Keep.TOP, mode=Mode.PRIVATE)
    fillet2_piece_33 = fillet2_piece_33a & fillet2_piece_33b
    add(fillet2_piece_33, mode=Mode.SUBTRACT)
    with BuildSketch(Plane(origin=(10.5, -3, 0), x_dir=(0, 0, 1), z_dir=(-1, 0, 0))) as fillet2_piece_34a_section:
        with BuildLine():
            CenterArc((FILLET2_R, FILLET2_R), FILLET2_R, 180, 90)
            Line((0, FILLET2_R), (0, 0))
            Line((0, 0), (FILLET2_R, 0))
        make_face()
    fillet2_piece_34a = extrude(amount=6.25, mode=Mode.PRIVATE)
    fillet2_piece_34a = split(fillet2_piece_34a, bisect_by=Plane(origin=(5.5, -2.886802443, 0.113197557), z_dir=(-1, 0, 0)), keep=Keep.TOP, mode=Mode.PRIVATE)
    with BuildSketch(Plane(origin=(5.5, -3, -4.5), x_dir=(0, 1, 0), z_dir=(0, 0, 1))) as fillet2_piece_34b_section:
        with BuildLine():
            CenterArc((FILLET2_R, FILLET2_R), FILLET2_R, 180, 90)
            Line((0, FILLET2_R), (0, 0))
            Line((0, 0), (FILLET2_R, 0))
        make_face()
    fillet2_piece_34b = extrude(amount=5.75, mode=Mode.PRIVATE)
    fillet2_piece_34b = split(fillet2_piece_34b, bisect_by=Plane(origin=(5.386802443, -2.886802443, 0), z_dir=(0, 0, 1)), keep=Keep.TOP, mode=Mode.PRIVATE)
    fillet2_piece_34 = fillet2_piece_34a & fillet2_piece_34b
    add(fillet2_piece_34, mode=Mode.SUBTRACT)


solid = part.part
